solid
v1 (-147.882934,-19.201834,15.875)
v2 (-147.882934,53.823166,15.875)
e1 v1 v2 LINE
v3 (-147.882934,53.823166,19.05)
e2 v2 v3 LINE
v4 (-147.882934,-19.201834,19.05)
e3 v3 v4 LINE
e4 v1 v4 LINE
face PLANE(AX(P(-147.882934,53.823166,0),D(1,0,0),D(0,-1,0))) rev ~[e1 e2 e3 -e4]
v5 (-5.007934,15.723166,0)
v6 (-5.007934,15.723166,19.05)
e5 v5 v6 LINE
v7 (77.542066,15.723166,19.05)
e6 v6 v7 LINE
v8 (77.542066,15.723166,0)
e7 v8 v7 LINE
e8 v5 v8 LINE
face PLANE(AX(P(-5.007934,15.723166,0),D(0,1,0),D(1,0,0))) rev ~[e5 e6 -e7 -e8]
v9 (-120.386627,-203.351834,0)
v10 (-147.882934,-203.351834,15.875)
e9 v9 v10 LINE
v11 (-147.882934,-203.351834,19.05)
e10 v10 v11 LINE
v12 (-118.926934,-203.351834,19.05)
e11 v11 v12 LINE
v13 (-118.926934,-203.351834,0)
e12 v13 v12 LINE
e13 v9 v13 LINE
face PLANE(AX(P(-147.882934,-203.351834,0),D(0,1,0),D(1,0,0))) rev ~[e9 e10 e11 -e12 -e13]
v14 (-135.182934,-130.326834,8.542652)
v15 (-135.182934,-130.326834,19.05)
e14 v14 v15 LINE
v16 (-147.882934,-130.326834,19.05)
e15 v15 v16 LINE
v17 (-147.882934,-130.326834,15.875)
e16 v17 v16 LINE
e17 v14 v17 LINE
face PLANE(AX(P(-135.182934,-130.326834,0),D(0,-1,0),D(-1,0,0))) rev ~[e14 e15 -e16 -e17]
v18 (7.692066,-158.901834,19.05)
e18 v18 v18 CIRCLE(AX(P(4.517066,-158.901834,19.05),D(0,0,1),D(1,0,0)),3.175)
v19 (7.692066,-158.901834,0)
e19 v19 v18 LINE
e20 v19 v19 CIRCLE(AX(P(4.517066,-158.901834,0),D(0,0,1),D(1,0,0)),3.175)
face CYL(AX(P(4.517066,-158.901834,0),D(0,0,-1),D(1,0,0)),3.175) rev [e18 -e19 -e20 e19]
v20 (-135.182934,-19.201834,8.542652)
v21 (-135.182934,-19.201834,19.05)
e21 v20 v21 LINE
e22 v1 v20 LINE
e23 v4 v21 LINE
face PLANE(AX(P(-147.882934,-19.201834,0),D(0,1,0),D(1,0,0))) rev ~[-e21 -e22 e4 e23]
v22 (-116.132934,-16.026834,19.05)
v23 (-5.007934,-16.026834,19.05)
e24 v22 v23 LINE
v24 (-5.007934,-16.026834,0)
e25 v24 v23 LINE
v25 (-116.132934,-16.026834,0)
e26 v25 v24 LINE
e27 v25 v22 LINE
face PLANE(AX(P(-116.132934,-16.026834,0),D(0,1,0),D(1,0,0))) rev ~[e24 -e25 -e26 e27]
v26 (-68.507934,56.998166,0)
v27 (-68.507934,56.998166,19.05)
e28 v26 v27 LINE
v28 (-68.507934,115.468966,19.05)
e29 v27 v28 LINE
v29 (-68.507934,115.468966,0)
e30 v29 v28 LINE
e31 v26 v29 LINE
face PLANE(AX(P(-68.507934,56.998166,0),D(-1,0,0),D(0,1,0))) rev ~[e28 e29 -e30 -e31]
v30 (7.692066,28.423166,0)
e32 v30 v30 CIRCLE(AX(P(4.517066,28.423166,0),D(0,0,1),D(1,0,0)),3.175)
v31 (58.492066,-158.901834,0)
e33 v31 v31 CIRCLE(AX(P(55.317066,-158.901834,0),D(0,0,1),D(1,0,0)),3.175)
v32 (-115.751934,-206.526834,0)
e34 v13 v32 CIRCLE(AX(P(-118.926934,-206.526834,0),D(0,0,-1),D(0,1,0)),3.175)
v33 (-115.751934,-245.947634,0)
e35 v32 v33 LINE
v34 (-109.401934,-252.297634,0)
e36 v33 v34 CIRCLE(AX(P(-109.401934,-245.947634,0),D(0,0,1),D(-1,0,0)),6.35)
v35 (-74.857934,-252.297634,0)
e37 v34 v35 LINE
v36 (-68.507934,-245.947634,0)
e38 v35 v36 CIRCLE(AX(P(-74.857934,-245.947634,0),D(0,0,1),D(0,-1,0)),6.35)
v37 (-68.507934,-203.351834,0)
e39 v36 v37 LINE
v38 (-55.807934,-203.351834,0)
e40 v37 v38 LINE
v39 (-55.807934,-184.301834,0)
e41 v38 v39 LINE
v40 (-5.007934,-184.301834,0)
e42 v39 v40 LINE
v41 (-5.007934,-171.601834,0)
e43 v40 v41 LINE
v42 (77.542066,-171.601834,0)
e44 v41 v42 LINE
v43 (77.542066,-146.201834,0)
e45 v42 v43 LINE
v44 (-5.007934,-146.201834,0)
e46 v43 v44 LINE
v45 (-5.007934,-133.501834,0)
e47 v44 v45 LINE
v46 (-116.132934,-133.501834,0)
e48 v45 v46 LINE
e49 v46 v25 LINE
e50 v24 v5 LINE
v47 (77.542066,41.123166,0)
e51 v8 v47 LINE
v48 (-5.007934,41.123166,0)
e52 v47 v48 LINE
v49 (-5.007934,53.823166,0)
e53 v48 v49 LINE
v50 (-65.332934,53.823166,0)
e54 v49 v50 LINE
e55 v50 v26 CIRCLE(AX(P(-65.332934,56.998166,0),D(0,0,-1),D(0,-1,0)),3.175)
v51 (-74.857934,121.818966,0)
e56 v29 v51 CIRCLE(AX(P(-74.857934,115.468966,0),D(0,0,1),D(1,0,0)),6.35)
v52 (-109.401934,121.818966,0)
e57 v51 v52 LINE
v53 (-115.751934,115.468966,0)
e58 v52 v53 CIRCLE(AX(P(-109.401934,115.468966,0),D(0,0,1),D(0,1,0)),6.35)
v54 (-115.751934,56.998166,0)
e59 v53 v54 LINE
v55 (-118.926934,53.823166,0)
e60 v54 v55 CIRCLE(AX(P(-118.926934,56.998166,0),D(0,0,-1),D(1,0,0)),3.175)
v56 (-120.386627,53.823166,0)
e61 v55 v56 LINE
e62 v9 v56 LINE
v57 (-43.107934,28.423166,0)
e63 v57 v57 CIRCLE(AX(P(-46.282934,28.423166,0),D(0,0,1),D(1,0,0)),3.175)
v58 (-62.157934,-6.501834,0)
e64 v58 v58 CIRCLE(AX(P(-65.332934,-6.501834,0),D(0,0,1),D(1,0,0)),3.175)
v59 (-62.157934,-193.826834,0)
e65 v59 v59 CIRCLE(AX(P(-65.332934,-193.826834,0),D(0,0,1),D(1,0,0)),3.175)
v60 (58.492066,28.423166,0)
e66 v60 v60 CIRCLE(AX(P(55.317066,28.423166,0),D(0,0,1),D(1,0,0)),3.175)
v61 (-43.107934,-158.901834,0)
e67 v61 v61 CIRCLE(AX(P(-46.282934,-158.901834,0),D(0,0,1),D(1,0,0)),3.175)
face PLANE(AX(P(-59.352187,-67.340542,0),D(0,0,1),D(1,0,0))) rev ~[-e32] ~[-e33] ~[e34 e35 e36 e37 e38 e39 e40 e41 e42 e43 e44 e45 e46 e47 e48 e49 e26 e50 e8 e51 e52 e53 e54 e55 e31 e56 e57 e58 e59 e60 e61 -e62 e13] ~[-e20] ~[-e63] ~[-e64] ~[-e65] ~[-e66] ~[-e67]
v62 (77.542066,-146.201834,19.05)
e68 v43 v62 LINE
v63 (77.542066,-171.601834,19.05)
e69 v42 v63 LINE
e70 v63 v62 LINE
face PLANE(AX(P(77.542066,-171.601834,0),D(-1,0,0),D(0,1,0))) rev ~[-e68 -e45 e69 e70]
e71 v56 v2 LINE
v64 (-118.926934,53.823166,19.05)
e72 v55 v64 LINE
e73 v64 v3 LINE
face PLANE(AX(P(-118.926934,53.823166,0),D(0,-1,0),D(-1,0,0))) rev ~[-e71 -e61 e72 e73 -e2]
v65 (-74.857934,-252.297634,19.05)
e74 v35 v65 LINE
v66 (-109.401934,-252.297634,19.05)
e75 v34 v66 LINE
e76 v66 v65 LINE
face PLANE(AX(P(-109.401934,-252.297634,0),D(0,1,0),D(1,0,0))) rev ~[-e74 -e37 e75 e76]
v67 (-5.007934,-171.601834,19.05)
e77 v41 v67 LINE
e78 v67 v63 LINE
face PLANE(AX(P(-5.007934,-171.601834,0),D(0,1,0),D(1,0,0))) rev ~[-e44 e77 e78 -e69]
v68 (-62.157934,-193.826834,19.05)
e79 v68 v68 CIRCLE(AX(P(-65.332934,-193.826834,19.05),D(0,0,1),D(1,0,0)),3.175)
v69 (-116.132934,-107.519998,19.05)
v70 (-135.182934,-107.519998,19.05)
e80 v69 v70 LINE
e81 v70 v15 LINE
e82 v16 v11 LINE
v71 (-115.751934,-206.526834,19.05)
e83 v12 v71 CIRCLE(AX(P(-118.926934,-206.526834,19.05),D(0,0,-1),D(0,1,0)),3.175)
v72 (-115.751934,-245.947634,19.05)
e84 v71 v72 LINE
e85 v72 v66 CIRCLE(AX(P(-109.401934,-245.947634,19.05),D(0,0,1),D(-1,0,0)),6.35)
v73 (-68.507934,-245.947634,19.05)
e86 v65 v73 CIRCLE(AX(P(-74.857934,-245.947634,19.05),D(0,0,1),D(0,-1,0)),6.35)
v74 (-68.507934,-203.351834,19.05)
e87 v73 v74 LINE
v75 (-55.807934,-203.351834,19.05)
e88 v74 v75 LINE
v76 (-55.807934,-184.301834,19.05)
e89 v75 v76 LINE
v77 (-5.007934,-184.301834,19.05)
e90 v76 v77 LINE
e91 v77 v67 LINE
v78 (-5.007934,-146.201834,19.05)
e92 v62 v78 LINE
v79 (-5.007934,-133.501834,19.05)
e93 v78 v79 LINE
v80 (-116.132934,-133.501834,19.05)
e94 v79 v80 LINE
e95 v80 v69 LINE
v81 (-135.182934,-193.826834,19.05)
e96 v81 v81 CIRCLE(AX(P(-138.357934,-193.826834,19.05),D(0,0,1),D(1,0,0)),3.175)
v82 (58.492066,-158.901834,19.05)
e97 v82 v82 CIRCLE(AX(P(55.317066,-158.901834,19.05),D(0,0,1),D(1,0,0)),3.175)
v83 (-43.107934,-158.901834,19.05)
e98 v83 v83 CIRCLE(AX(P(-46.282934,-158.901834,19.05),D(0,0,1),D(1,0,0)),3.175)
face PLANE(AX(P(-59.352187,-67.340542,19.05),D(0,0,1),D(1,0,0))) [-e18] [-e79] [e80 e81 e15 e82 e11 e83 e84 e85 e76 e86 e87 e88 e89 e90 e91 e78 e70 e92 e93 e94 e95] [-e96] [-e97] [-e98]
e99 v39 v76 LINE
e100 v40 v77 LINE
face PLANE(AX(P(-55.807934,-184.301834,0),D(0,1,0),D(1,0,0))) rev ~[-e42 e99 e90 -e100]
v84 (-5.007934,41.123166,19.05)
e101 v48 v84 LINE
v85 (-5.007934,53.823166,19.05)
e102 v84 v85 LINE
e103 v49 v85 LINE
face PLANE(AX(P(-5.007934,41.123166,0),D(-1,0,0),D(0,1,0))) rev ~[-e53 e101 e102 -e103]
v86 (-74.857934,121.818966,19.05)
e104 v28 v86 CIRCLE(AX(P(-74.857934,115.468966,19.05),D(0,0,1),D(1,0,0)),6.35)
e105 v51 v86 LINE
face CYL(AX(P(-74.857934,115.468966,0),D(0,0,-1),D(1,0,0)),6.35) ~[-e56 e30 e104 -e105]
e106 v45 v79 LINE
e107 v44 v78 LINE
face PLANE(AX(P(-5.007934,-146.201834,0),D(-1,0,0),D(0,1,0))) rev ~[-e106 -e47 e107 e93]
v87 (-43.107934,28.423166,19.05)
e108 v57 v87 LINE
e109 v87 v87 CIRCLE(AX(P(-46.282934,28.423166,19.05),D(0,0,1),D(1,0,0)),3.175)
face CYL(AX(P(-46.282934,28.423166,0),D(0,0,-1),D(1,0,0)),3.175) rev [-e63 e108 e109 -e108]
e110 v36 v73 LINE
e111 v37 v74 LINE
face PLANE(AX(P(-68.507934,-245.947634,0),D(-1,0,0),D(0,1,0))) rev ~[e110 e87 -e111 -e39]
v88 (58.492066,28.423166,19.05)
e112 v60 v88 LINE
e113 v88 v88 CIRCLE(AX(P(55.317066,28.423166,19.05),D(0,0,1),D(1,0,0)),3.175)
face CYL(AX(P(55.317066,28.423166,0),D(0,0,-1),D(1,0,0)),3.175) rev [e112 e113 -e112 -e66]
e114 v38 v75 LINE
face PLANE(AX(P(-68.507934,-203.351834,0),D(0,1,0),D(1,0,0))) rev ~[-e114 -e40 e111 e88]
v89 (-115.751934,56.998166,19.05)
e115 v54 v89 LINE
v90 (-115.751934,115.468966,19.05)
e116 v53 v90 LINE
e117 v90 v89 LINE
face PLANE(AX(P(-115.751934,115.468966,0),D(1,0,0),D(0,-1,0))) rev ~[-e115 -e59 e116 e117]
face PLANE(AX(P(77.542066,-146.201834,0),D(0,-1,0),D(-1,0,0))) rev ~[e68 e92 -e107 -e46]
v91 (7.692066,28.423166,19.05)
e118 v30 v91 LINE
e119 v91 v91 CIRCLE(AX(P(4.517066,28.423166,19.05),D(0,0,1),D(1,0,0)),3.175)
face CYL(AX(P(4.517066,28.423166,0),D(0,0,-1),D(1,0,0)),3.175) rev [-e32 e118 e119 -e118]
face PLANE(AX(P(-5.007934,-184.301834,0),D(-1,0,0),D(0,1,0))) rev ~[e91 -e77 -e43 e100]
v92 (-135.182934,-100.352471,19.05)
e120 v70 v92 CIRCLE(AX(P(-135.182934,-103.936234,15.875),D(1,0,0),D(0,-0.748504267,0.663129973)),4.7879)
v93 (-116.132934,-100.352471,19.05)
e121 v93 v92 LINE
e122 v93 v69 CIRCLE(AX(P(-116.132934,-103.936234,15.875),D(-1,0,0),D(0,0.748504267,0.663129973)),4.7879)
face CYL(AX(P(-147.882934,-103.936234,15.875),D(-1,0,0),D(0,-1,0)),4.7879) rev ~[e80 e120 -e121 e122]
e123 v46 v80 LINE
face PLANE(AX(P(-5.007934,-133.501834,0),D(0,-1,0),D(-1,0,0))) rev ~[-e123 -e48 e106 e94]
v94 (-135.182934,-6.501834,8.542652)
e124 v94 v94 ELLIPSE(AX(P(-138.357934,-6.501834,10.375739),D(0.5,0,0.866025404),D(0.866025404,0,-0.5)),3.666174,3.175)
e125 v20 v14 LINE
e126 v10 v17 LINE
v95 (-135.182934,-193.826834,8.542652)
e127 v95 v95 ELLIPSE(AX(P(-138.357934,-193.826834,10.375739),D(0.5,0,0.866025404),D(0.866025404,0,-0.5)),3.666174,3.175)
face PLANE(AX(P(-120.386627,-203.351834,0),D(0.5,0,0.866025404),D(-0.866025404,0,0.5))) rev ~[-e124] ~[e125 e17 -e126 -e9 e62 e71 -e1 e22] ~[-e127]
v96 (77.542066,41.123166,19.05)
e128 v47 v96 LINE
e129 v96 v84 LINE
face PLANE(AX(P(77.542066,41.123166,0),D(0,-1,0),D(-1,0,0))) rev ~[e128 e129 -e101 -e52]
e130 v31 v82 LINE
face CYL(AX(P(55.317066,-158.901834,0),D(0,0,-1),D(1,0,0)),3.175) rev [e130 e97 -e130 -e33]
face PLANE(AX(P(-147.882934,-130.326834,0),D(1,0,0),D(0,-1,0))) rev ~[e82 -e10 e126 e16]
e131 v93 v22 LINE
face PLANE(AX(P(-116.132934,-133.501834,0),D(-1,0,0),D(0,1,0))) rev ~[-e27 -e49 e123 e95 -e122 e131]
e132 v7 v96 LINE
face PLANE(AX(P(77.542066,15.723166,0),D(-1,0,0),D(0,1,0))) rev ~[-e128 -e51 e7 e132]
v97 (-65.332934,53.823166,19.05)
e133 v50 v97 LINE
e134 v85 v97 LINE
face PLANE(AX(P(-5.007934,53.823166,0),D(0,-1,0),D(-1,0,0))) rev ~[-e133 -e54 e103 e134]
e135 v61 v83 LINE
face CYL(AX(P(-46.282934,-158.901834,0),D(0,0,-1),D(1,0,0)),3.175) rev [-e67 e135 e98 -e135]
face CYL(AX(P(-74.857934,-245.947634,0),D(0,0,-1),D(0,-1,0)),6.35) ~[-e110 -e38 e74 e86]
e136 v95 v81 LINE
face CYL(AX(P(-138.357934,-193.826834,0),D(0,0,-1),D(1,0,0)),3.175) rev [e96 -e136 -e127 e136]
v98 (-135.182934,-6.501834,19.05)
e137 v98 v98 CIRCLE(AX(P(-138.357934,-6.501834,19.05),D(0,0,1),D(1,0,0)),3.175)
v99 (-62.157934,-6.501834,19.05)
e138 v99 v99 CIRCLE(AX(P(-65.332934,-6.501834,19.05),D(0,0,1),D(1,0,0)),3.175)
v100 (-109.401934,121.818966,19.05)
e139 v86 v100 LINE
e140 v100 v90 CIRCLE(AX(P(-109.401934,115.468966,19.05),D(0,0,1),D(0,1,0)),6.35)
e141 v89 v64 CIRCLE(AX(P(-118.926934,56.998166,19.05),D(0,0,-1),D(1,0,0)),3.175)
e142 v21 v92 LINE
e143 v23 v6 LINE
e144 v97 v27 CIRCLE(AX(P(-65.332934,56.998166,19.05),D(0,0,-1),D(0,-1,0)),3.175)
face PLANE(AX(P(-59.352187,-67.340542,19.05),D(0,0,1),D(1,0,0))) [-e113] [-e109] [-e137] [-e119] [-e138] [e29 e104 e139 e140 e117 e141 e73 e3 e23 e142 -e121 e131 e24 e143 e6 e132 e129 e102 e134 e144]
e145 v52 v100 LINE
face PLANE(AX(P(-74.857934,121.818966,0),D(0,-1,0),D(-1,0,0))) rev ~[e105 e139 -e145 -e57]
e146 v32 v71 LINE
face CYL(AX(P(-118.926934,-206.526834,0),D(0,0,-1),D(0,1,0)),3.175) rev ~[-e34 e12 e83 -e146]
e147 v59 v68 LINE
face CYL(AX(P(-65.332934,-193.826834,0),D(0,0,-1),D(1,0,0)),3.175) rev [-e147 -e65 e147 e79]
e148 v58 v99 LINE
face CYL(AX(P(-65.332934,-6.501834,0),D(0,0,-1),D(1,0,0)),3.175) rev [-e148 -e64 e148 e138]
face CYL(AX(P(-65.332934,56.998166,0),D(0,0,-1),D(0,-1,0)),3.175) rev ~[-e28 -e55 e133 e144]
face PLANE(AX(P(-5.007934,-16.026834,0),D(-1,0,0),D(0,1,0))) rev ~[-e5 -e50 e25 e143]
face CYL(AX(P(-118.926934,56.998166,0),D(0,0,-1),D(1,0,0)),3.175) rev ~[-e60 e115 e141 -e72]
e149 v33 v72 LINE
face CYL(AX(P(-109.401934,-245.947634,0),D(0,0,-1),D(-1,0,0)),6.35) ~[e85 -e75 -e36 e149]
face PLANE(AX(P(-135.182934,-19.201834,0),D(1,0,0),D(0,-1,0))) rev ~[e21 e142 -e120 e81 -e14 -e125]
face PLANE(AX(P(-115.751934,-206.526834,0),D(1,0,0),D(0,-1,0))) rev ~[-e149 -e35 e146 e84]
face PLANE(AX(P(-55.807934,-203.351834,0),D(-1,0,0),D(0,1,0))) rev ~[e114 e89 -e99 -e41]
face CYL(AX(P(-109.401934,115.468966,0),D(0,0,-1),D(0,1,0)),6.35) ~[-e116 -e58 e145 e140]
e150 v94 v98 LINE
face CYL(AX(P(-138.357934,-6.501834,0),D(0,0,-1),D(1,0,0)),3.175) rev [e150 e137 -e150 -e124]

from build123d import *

# Parameters (mm, degrees)
F0_R     = 3.175
F1_DEPTH = 19.05
F2_R     = 4.7879
F3_DEPTH = 50.8
F5_DEPTH = 279.4


# Not quite as in the source:
# - a feature names something its author has since deleted; it is built from what else it names


with BuildPart() as f1:
    # F0 (on Top) → F1 (new body)
    with BuildSketch(Plane.XY):
        with BuildLine():
            Line((-118.9269337424, 53.8231658584), (-147.8829337424, 53.8231658584))
            Line((-147.8829337424, 53.8231658584), (-147.8829337424, -16.0268341416))
            Line((-147.8829337424, -16.0268341416), (-147.8829337424, -19.2018341416))
            Line((-147.8829337424, -19.2018341416), (-135.1829337424, -19.2018341416))
            Line((-135.1829337424, -19.2018341416), (-135.1829337424, -130.3268341416))
            Line((-135.1829337424, -130.3268341416), (-147.8829337424, -130.3268341416))
            Line((-147.8829337424, -130.3268341416), (-147.8829337424, -136.6768341416))
            Line((-147.8829337424, -136.6768341416), (-147.8829337424, -171.6018341416))
            Line((-147.8829337424, -171.6018341416), (-147.8829337424, -203.3518341416))
            Line((-147.8829337424, -203.3518341416), (-118.9269337424, -203.3518341416))
            ThreePointArc((-118.9269337424, -203.3518341416), (-116.6818697121, -204.2817701113), (-115.7519337424, -206.5268341416))
            Line((-115.7519337424, -206.5268341416), (-115.7519337424, -245.9476341416))
            ThreePointArc((-115.7519337424, -245.9476341416), (-113.8920618029, -250.4377622021), (-109.4019337424, -252.2976341416))
            Line((-109.4019337424, -252.2976341416), (-74.8579337424, -252.2976341416))
            ThreePointArc((-74.8579337424, -252.2976341416), (-70.3678056819, -250.4377622021), (-68.5079337424, -245.9476341416))
            Line((-68.5079337424, -245.9476341416), (-68.5079337424, -203.3518341416))
            Line((-68.5079337424, -203.3518341416), (-55.8079337424, -203.3518341416))
            Line((-55.8079337424, -203.3518341416), (-55.8079337424, -184.3018341416))
            Line((-55.8079337424, -184.3018341416), (-5.0079337424, -184.3018341416))
            Line((-5.0079337424, -184.3018341416), (-5.0079337424, -171.6018341416))
            Line((-5.0079337424, -171.6018341416), (77.5420662576, -171.6018341416))
            Line((77.5420662576, -171.6018341416), (77.5420662576, -146.2018341416))
            Line((77.5420662576, -146.2018341416), (-5.0079337424, -146.2018341416))
            Line((-5.0079337424, -146.2018341416), (-5.0079337424, -133.5018341416))
            Line((-5.0079337424, -133.5018341416), (-27.2329337424, -133.5018341416))
            Line((-27.2329337424, -133.5018341416), (-116.1329337424, -133.5018341416))
            Line((-116.1329337424, -133.5018341416), (-116.1329337424, -16.0268341416))
            Line((-116.1329337424, -16.0268341416), (-22.9684459845, -16.0268341416))
            Line((-22.9684459845, -16.0268341416), (-5.0079337424, -16.0268341416))
            Line((-5.0079337424, -16.0268341416), (-5.0079337424, -7.9982466186))
            Line((-5.0079337424, -7.9982466186), (-5.0079337424, 15.7231658584))
            Line((-5.0079337424, 15.7231658584), (77.5420662576, 15.7231658584))
            Line((77.5420662576, 15.7231658584), (77.5420662576, 41.1231658584))
            Line((77.5420662576, 41.1231658584), (-5.0079337424, 41.1231658584))
            Line((-5.0079337424, 41.1231658584), (-5.0079337424, 53.8231658584))
            Line((-5.0079337424, 53.8231658584), (-65.3329337424, 53.8231658584))
            ThreePointArc((-65.3329337424, 53.8231658584), (-67.5779977727, 54.7531018282), (-68.5079337424, 56.9981658584))
            Line((-68.5079337424, 56.9981658584), (-68.5079337424, 115.4689658584))
            ThreePointArc((-68.5079337424, 115.4689658584), (-70.3678056819, 119.959093919), (-74.8579337424, 121.8189658584))
            Line((-74.8579337424, 121.8189658584), (-109.4019337424, 121.8189658584))
            ThreePointArc((-109.4019337424, 121.8189658584), (-113.8920618029, 119.959093919), (-115.7519337424, 115.4689658584))
            Line((-115.7519337424, 115.4689658584), (-115.7519337424, 56.9981658584))
            ThreePointArc((-115.7519337424, 56.9981658584), (-116.6818697121, 54.7531018282), (-118.9269337424, 53.8231658584))
        make_face()
        with Locations((-138.3579337424, -193.8268341416)):
            Circle(F0_R, mode=Mode.SUBTRACT)
        with Locations((-65.3329337424, -193.8268341416)):
            Circle(F0_R, mode=Mode.SUBTRACT)
        with Locations((-46.2829337424, -158.9018341416)):
            Circle(F0_R, mode=Mode.SUBTRACT)
        with Locations((4.5170662576, -158.9018341416)):
            Circle(F0_R, mode=Mode.SUBTRACT)
        with Locations((55.3170662576, -158.9018341416)):
            Circle(F0_R, mode=Mode.SUBTRACT)
        with Locations((-138.3579337424, -6.5018341416)):
            Circle(F0_R, mode=Mode.SUBTRACT)
        with Locations((-65.3329337424, -6.5018341416)):
            Circle(F0_R, mode=Mode.SUBTRACT)
        with Locations((-46.2829337424, 28.4231658584)):
            Circle(F0_R, mode=Mode.SUBTRACT)
        with Locations((4.5170662576, 28.4231658584)):
            Circle(F0_R, mode=Mode.SUBTRACT)
        with Locations((55.3170662576, 28.4231658584)):
            Circle(F0_R, mode=Mode.SUBTRACT)
    extrude(amount=F1_DEPTH)

    # F2 (on face) → F3 (cut)
    with BuildSketch(Plane(origin=(-147.8829337424, 0, 0), x_dir=(0, -1, 0), z_dir=(-1, 0, 0))):
        with Locations((103.9362341416, 15.875)):
            Circle(F2_R)
    extrude(amount=-F3_DEPTH, mode=Mode.SUBTRACT)

    # F4 (on face) → F5 (cut)
    with BuildSketch(Plane.XZ.offset(203.3518341416)):
        Polygon((-120.3866271722, 0), (-147.8829337424, 15.875), (-147.8829337424, 0), align=None)
    extrude(amount=-F5_DEPTH, mode=Mode.SUBTRACT)


solid = f1.part
